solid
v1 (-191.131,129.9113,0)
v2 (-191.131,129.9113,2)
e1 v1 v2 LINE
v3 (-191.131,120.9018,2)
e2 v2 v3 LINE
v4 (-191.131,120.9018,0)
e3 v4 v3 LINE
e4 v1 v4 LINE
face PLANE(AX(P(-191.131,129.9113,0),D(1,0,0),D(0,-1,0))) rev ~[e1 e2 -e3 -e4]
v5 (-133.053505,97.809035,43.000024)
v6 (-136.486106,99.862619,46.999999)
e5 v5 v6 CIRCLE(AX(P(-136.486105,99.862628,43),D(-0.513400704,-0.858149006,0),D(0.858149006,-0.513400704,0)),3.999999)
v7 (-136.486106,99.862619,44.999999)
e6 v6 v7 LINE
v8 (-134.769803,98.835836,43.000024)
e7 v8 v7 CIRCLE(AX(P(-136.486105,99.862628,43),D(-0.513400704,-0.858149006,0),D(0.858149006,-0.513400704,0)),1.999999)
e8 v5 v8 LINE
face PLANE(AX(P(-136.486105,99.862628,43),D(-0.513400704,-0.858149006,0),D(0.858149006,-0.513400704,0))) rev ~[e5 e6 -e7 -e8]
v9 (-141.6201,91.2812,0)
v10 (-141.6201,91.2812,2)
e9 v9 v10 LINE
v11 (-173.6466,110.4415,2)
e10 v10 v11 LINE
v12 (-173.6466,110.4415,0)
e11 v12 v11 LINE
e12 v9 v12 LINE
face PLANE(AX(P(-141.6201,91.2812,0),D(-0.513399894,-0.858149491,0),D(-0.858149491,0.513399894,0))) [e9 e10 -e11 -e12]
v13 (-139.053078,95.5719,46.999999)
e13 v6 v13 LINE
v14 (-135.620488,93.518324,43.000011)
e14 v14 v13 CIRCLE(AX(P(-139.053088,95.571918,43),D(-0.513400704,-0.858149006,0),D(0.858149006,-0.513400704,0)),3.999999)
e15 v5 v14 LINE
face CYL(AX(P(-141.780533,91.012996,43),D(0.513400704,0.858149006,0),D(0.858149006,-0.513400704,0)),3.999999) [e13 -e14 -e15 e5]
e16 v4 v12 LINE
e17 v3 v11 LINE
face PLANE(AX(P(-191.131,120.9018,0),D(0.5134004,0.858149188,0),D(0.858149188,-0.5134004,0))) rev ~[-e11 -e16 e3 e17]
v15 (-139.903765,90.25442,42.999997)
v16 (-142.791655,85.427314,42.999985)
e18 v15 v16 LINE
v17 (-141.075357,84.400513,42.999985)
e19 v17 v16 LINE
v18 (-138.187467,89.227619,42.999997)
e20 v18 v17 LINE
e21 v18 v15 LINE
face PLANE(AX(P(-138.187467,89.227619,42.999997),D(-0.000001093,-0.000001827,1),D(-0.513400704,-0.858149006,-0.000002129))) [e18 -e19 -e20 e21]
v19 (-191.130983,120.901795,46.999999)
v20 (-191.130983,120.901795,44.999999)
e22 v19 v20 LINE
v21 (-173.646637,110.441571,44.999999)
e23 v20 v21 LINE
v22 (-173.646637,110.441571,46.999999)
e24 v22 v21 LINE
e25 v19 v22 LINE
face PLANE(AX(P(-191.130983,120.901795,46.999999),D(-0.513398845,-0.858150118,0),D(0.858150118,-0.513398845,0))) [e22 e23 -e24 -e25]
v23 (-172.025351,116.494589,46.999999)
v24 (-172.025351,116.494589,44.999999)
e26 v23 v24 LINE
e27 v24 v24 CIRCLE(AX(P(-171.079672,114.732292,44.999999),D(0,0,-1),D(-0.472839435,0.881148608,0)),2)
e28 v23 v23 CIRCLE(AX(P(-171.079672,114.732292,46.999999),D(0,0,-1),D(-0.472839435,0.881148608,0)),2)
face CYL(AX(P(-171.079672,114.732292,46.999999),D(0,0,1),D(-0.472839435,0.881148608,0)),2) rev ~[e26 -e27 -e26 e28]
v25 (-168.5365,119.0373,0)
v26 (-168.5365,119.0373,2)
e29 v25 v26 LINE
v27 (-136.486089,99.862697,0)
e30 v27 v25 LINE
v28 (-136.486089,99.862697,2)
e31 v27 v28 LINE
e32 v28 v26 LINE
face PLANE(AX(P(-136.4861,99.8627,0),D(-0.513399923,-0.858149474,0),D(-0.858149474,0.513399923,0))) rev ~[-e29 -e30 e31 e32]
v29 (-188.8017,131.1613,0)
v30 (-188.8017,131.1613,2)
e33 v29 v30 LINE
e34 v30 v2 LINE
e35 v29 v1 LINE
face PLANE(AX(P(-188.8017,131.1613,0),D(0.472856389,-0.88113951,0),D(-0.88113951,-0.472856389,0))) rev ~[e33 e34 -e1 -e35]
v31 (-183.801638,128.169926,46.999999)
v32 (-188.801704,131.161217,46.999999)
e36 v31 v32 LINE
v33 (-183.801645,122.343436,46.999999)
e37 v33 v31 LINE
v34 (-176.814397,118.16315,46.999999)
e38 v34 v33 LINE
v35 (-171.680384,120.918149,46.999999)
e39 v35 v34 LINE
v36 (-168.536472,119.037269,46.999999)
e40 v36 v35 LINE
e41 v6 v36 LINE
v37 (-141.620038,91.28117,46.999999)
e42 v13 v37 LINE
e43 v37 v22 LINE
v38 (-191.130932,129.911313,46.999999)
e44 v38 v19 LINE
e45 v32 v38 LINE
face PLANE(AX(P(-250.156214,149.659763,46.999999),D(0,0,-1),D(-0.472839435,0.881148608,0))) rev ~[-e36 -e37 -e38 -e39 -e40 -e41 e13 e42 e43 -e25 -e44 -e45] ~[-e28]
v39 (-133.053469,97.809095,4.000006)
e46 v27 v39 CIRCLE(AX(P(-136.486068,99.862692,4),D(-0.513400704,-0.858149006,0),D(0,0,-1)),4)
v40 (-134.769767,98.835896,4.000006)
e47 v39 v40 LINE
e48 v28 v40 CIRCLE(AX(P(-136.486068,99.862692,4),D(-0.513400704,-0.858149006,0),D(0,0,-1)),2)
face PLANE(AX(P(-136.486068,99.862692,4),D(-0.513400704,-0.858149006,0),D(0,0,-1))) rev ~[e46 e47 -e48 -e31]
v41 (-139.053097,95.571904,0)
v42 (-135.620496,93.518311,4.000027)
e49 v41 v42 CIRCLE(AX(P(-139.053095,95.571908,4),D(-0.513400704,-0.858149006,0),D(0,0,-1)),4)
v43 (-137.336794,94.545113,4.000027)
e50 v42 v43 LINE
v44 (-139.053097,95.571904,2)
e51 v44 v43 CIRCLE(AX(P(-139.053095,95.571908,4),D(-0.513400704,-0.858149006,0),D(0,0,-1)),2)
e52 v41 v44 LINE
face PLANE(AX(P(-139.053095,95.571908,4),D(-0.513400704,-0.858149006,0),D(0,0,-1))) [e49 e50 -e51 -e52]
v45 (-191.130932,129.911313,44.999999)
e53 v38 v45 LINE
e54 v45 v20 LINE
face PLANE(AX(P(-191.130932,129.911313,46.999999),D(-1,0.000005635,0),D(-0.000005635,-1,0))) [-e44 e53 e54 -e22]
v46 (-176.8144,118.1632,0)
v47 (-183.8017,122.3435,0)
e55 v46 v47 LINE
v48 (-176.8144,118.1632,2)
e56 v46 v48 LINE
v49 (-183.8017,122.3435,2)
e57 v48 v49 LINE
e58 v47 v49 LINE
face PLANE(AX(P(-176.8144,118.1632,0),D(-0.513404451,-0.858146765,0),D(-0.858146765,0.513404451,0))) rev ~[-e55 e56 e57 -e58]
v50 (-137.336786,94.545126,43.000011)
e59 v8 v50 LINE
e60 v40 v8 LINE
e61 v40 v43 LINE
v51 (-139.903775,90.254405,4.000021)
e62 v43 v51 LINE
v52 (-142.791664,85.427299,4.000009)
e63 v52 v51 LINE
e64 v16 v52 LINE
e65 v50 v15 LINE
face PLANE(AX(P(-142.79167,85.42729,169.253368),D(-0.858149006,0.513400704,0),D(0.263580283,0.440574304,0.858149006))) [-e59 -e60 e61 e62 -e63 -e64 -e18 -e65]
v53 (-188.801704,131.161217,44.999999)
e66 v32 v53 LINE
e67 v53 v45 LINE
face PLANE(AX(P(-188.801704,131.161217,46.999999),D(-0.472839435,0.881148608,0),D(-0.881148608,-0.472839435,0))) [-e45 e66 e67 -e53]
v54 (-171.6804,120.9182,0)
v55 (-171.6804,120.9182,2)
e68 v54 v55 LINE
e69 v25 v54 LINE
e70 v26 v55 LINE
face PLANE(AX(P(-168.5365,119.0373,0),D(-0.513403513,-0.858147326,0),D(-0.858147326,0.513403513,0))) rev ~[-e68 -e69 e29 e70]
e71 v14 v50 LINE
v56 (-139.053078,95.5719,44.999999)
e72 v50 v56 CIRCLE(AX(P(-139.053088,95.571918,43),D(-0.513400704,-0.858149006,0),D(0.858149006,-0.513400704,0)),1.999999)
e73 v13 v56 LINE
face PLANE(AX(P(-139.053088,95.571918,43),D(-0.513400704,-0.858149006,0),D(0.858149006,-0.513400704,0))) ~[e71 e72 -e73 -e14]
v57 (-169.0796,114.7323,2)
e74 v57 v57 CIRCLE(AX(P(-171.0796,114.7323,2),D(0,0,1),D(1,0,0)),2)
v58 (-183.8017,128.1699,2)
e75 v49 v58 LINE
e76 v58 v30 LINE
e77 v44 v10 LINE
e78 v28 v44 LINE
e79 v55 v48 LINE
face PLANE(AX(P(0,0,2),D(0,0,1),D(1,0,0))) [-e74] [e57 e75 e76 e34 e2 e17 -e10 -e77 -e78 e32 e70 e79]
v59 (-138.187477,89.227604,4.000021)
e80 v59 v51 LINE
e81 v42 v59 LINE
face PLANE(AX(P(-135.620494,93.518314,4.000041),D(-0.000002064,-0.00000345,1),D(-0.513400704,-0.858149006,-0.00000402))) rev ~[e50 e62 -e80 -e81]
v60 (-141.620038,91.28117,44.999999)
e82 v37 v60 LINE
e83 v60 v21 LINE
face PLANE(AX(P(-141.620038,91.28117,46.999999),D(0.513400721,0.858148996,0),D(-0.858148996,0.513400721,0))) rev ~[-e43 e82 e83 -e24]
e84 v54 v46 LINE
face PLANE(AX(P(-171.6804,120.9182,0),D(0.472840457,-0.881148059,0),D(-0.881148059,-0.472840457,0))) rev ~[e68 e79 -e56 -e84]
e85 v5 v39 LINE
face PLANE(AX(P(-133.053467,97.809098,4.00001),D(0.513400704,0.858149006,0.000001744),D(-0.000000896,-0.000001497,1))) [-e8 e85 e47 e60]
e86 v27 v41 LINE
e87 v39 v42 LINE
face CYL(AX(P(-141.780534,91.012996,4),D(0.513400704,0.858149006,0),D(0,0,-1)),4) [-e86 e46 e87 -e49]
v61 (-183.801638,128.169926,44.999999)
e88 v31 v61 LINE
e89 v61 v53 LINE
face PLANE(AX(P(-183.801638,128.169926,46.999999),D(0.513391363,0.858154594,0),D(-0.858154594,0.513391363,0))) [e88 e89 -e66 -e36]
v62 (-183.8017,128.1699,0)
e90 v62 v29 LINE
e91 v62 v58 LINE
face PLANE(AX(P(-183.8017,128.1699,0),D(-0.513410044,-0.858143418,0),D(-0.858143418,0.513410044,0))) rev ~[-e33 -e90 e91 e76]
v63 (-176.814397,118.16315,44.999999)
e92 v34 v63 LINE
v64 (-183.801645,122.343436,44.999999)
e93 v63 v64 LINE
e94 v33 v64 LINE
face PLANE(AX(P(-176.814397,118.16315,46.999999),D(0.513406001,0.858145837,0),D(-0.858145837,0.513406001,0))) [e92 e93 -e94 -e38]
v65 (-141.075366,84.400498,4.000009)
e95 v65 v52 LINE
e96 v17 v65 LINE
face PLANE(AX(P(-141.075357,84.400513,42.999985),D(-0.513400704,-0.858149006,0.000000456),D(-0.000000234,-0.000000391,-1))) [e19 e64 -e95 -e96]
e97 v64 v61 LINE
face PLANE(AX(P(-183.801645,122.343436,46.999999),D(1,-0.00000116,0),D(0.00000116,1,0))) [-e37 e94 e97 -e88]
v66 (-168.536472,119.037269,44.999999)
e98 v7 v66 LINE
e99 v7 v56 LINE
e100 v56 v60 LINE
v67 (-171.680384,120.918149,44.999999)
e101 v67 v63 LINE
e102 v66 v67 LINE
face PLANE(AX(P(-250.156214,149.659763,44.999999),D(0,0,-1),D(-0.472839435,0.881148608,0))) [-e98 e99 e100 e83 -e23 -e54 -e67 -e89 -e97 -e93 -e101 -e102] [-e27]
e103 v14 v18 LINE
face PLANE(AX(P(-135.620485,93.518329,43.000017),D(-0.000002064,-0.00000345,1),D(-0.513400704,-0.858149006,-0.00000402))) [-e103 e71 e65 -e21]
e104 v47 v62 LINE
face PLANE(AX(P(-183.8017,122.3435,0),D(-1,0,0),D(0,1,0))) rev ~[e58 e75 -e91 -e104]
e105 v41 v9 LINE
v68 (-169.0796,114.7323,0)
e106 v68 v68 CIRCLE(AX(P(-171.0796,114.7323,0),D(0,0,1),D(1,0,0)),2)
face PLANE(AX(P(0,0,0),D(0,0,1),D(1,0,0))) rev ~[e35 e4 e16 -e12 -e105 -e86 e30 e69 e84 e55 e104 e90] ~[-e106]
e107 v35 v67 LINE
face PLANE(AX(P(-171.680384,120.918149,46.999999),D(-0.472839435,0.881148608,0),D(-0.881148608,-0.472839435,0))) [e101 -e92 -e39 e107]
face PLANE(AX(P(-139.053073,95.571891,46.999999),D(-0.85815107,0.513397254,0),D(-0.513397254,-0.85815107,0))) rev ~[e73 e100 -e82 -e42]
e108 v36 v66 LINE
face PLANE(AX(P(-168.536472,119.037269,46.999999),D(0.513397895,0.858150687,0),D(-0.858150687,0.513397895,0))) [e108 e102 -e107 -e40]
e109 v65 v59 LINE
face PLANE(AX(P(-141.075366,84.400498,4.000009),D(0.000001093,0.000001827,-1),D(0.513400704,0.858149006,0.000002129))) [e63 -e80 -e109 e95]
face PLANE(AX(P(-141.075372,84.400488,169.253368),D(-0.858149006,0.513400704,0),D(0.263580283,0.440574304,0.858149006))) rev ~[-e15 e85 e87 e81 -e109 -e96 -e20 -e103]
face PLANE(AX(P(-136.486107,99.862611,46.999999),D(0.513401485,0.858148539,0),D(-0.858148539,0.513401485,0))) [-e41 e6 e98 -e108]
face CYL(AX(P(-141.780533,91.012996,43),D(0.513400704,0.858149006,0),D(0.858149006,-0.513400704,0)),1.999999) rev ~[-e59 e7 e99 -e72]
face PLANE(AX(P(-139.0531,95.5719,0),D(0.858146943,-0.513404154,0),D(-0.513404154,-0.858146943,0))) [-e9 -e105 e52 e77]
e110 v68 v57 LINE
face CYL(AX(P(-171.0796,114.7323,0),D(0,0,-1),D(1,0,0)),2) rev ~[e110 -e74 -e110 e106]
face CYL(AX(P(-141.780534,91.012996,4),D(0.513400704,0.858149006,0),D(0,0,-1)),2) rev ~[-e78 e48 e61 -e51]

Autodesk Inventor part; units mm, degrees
ref_plane "YZ Plane" through (0, 0, 0) normal (1, 0, 0) x (0, 1, 0)
ref_plane "XZ Plane" through (0, 0, 0) normal (0, 1, 0) x (-1, 0, 0)
ref_plane "XY Plane" through (0, 0, 0) normal (0, 0, 1) x (1, 0, 0)
sketch "Sketch3" plane through (0, 0, 0) normal (0, 0, 1) x (1, 0, 0)
  circle A0 centre (367.816, 50) radius 50 construction
  line L0 (367.816, 0) -> (512.7041, 0) construction
  line L1 (367.816, 50) -> (512.7041, 50) construction
  line L2 (367.816, 100) -> (512.7041, 100) construction
  line L3 (367.816, 50) -> (342.816, 6.6987) construction
  line L4 (367.816, 50) -> (324.5147, 25) construction
  line L5 (367.816, 50) -> (324.5147, 75) construction
  line L6 (342.816, 93.3013) -> (367.816, 50) construction
  line L7 (392.816, 93.3013) -> (367.816, 50) construction
  line L8 (411.1173, 75) -> (367.816, 50) construction
  line L9 (411.1173, 25) -> (367.816, 50) construction
  line L10 (392.816, 6.6987) -> (367.816, 50) construction
  line L11 (367.816, 0) -> (367.816, 100) construction
  line L12 (417.816, 50) -> (367.816, 50) construction
  line L13 (341.6361, 0) -> (341.6361, 100) construction
  line L14 (315.4561, 0) -> (315.4561, 100) construction
  line L15 (289.2762, 0) -> (289.2762, 100) construction
  line L16 (263.0963, 0) -> (263.0963, 100) construction
  line L17 (236.9163, 0) -> (236.9163, 100) construction
  line L18 (210.7364, 0) -> (210.7364, 100) construction
  line L19 (184.5564, 0) -> (184.5564, 100) construction
  line L20 (158.3765, 0) -> (158.3765, 100) construction
  circle A1 centre (315.4561, 50) radius 50 construction
  circle A2 centre (341.6361, 50) radius 50 construction
  circle A3 centre (289.2762, 50) radius 50 construction
  circle A4 centre (263.0963, 50) radius 50 construction
  circle A5 centre (236.9163, 50) radius 50 construction
  circle A6 centre (210.7364, 50) radius 50 construction
  line L21 (392.816, 6.6987) -> (512.7041, 6.6987) construction
  line L22 (411.1173, 25) -> (512.7041, 25) construction
  line L23 (411.1173, 75) -> (512.7041, 75) construction
  line L24 (411.1173, 75) -> (512.7041, 75) construction
  line L25 (392.816, 93.3013) -> (512.7041, 93.3013) construction
  line L26 (358.7574, 75) -> (339.2762, 50) construction
  line L27 (339.2762, 50) -> (306.3975, 25) construction
  line L28 (306.3975, 25) -> (261.9163, 6.6987) construction
  line L29 (261.9163, 6.6987) -> (210.7364, 0) construction
  line L30 (105.3682, -12.9392) -> (105.3682, 124.4333) construction
  line L31 (21.25, 0) -> (21.25, 12)
  line L32 (35.45, 12) -> (35.45, -11.8433)
  arc A7 (0, 0) -> (6.625, -9.8433) centre (10.625, 0) ccw
  arc A8 (14.625, -9.8433) -> (21.25, 0) centre (10.625, 0) ccw
  line L33 (35.45, -11.8433) -> (14.625, -11.8433)
  line L34 (6.625, -11.8433) -> (-195.0796, -11.8433)
  circle A9 centre (-144.26, 100.8473) radius 12.875 construction
  line L35 (6.625, -11.8433) -> (6.625, -9.8433)
  line L36 (14.625, -11.8433) -> (14.625, -9.8433)
  line L37 (411.1173, 75) -> (158.3765, 75) construction
  line L38 (367.816, 100) -> (158.3765, 100) construction
  line L39 (417.816, 50) -> (158.3765, 50) construction
  line L40 (411.1173, 25) -> (158.3765, 25) construction
  line L41 (392.816, 6.6987) -> (158.3765, 6.6987) construction
  line L42 (392.816, 93.3013) -> (158.3765, 93.3013) construction
  line L43 (358.7574, 75) -> (366.6361, 93.3013) construction
  line L44 (366.6361, 93.3013) -> (367.816, 100) construction
  spline S0 degree 4 poles (-157.0796, 100) (-157.0796, 88.9946) (-147.011, 72.6811) (-131.8577, 48.7932) (-88.4777, 17.6268) (-50.0176, 3.937) (-18.8717, 0) (0, 0) knots 0 0 0 0 0 0.264547 0.457223 0.66608 1 1 1 1 1
  line L45 (-157.0796, 100) -> (-157.0796, 38) construction
  line L46 (0, 0) -> (-157.0796, 0) construction
  line L47 (-144.26, 100.8473) -> (-157.135, 100.8473) construction
  circle A10 centre (-146.4546, 100) radius 10.625 construction
  line L48 (-146.4546, 100) -> (-157.0796, 100) construction
  line L49 (-141.0754, 84.4005) -> (-135.6205, 93.5183) construction
  line L50 (-141.0796, 132.0528) -> (-171.0796, 149.3733) construction
  line L51 (-171.0796, 149.3733) -> (-201.0796, 132.0528) construction
  line L52 (-141.0754, 84.4005) -> (-99.2801, 84.4005) construction
  line L53 (-201.0796, 132.0528) -> (-201.0796, 97.4118) construction
  line L54 (-201.0796, 97.4118) -> (-171.0796, 80.0913) construction
  line L55 (0, 0) -> (-157.0796, 93.9753) construction
  line L56 (-135.6205, 93.5183) -> (-137.3368, 94.5451) construction
  line L57 (-137.3368, 94.5451) -> (-143.2815, 84.6085) construction
  line L58 (-137.3368, 94.5451) -> (-171.0796, 114.7323) construction
  line L59 (-201.0796, 132.0528) -> (-171.0796, 114.7323) construction
  arc A11 (-137.3368, 94.5451) -> (-144.7045, 143.8948) centre (-171.0796, 114.7323) ccw construction
  arc A12 (-142.7917, 85.4273) -> (-147.1443, 147.6882) centre (-171.0796, 114.7323) ccw construction
  line L60 (-171.0796, 80.0913) -> (-171.0796, 35)
  circle A13 centre (-171.0796, 114.7323) radius 2.5 construction
  arc A14 (-167.4345, 120.8251) -> (-174.7248, 108.6394) centre (-171.0796, 114.7323) ccw construction
  line L61 (-167.4345, 120.8251) -> (-157.0796, 114.6302) construction
  line L62 (-171.0796, 80.0913) -> (-171.0796, 106.4587)
  line L63 (-171.0796, 106.4587) -> (-174.7248, 108.6394) construction
  line L64 (-171.0796, 35) -> (-191.5296, 23.1932)
  arc A15 (-191.5296, 23.1932) -> (-195.0796, 17.0444) centre (-187.9796, 17.0444) ccw
  line L65 (-195.0796, 17.0444) -> (-195.0796, -11.8433)
  arc A16 (35.45, 12) -> (21.25, 12) centre (28.35, 12) ccw
  line L66 (-157.0796, 114.6302) -> (-157.0796, 99.9865) construction
  circle A17 centre (-164.0796, 103.4587) radius 2.5
  line L67 (-171.0796, 103.4587) -> (-157.0796, 103.4587) construction
  circle A18 centre (-185.1284, 15.3983) radius 2.5
  line L68 (-185.1284, 15.3983) -> (-194.1284, 20.5944) construction
  circle A19 centre (-6, -5.9217) radius 2.5
  line L69 (-6, -11.8433) -> (-6, 0) construction
  circle A20 centre (28.35, 12) radius 2.5
  circle A21 centre (28.35, -5.9217) radius 2.5
  line L70 (-167.4345, 320.8251) -> (-157.0796, 314.6302) construction
  arc A22 (-167.4345, 320.8251) -> (-174.7248, 308.6394) centre (-171.0796, 314.7323) ccw construction
  circle A23 centre (-171.0796, 314.7323) radius 2.5 construction
  line L71 (-171.0796, 280.0913) -> (-171.0796, 306.4587)
  line L72 (-171.0796, 306.4587) -> (-174.7248, 308.6394) construction
  line L73 (-157.0796, 314.6302) -> (-157.0796, 299.9865) construction
  circle A24 centre (-164.0796, 303.4587) radius 2.5
  spline S1 degree 4 poles (-157.0796, 300) (-157.0796, 288.9946) (-147.0234, 272.6841) (-124.1789, 236.7977) (-70.8039, 208.0704) (-31.8865, 200.2943) (0, 200) knots 0 0 0 0 0 0.264547 0.457223 1 1 1 1 1 construction
  line L74 (-157.0796, 300) -> (-157.0796, 238) construction
  arc A25 (0, 200) -> (6.625, 190.1567) centre (10.625, 200) ccw
  line L75 (35.45, 212) -> (35.45, 188.1567)
  circle A26 centre (28.35, 212) radius 2.5
  circle A27 centre (28.35, 194.0783) radius 2.5
  arc A28 (35.45, 212) -> (21.25, 212) centre (28.35, 212) ccw
  line L76 (21.25, 200) -> (21.25, 212)
  line L77 (35.45, 188.1567) -> (14.625, 188.1567)
  arc A29 (14.625, 190.1567) -> (21.25, 200) centre (10.625, 200) ccw
  line L78 (14.625, 188.1567) -> (14.625, 190.1567)
  line L79 (-185.1284, 215.3983) -> (-194.1284, 220.5944) construction
  arc A30 (-191.5296, 223.1932) -> (-195.0796, 217.0444) centre (-187.9796, 217.0444) ccw
  line L80 (-195.0796, 217.0444) -> (-195.0796, 188.1567)
  line L81 (-171.0796, 235) -> (-191.5296, 223.1932)
  circle A31 centre (-185.1284, 215.3983) radius 2.5
  line L82 (-171.0796, 280.0913) -> (-171.0796, 235)
  line L83 (6.625, 188.1567) -> (-195.0796, 188.1567)
  line L84 (6.625, 188.1567) -> (6.625, 190.1567)
  line L85 (-137.3368, 294.5451) -> (-143.2815, 284.6085) construction
  line L86 (-141.0754, 284.4005) -> (-135.6205, 293.5183) construction
  line L87 (0, 200) -> (-157.0796, 293.9753)
  line L88 (-167.4345, 520.8251) -> (-157.0796, 514.6302) construction
  arc A32 (-167.4345, 520.8251) -> (-174.7248, 508.6394) centre (-171.0796, 514.7323) ccw construction
  circle A33 centre (-171.0796, 514.7323) radius 2.5 construction
  line L89 (-171.0796, 480.0913) -> (-171.0796, 506.4587)
  line L90 (-171.0796, 506.4587) -> (-174.7248, 508.6394) construction
  line L91 (-157.0796, 514.6302) -> (-157.0796, 499.9865) construction
  circle A34 centre (-164.0796, 503.4587) radius 2.5
  spline S2 degree 4 poles (-157.0796, 500) (-157.0796, 488.9946) (-147.0234, 472.6841) (-124.1789, 436.7977) (-70.8039, 408.0704) (-31.8865, 400.2943) (0, 400) knots 0 0 0 0 0 0.264547 0.457223 1 1 1 1 1 construction
  line L92 (-157.0796, 500) -> (-157.0796, 438)
  arc A35 (0, 400) -> (6.625, 390.1567) centre (10.625, 400) ccw
  line L93 (35.45, 412) -> (35.45, 388.1567)
  circle A36 centre (28.35, 412) radius 2.5
  circle A37 centre (28.35, 394.0783) radius 2.5
  arc A38 (35.45, 412) -> (21.25, 412) centre (28.35, 412) ccw
  line L94 (21.25, 400) -> (21.25, 412)
  line L95 (35.45, 388.1567) -> (14.625, 388.1567)
  arc A39 (14.625, 390.1567) -> (21.25, 400) centre (10.625, 400) ccw
  line L96 (14.625, 388.1567) -> (14.625, 390.1567)
  line L97 (-185.1284, 415.3983) -> (-194.1284, 420.5944) construction
  arc A40 (-191.5296, 423.1932) -> (-195.0796, 417.0444) centre (-187.9796, 417.0444) ccw
  line L98 (-195.0796, 417.0444) -> (-195.0796, 388.1567)
  line L99 (-171.0796, 435) -> (-191.5296, 423.1932)
  circle A41 centre (-185.1284, 415.3983) radius 2.5
  line L100 (-171.0796, 480.0913) -> (-171.0796, 435)
  line L101 (6.625, 388.1567) -> (-195.0796, 388.1567)
  line L102 (6.625, 388.1567) -> (6.625, 390.1567)
  line L103 (-137.3368, 494.5451) -> (-143.2815, 484.6085) construction
  line L104 (-141.0754, 484.4005) -> (-135.6205, 493.5183) construction
  line L105 (0, 400) -> (-157.0796, 493.9753) construction
  line L106 (-467.4345, 120.8251) -> (-457.0796, 114.6302) construction
  arc A42 (-467.4345, 120.8251) -> (-474.7248, 108.6394) centre (-471.0796, 114.7323) ccw construction
  circle A43 centre (-471.0796, 114.7323) radius 2.5 construction
  line L107 (-471.0796, 80.0913) -> (-471.0796, 106.4587)
  line L108 (-471.0796, 106.4587) -> (-474.7248, 108.6394) construction
  line L109 (-457.0796, 114.6302) -> (-457.0796, 99.9865) construction
  circle A44 centre (-464.0796, 103.4587) radius 2.5
  spline S3 degree 4 poles (-457.0796, 100) (-457.0796, 88.9946) (-447.0234, 72.6841) (-424.1789, 36.7977) (-370.8039, 8.0704) (-331.8865, 0.2943) (-300, 0) knots 0 0 0 0 0 0.264547 0.457223 1 1 1 1 1 construction
  line L110 (-457.0796, 100) -> (-457.0796, 38) construction
  arc A45 (-300, 0) -> (-293.375, -9.8433) centre (-289.375, 0) ccw construction
  line L111 (-264.55, 12) -> (-264.55, -11.8433)
  circle A46 centre (-271.65, 12) radius 2.5
  circle A47 centre (-271.65, -5.9217) radius 2.5
  arc A48 (-264.55, 12) -> (-278.75, 12) centre (-271.65, 12) ccw
  line L112 (-278.75, 0) -> (-278.75, 12) construction
  line L113 (-264.55, -11.8433) -> (-285.375, -11.8433)
  arc A49 (-285.375, -9.8433) -> (-278.75, 0) centre (-289.375, 0) ccw construction
  line L114 (-285.375, -11.8433) -> (-285.375, -9.8433) construction
  line L115 (-485.1284, 15.3983) -> (-494.1284, 20.5944) construction
  arc A50 (-491.5296, 23.1932) -> (-495.0796, 17.0444) centre (-487.9796, 17.0444) ccw
  line L116 (-495.0796, 17.0444) -> (-495.0796, -11.8433)
  line L117 (-471.0796, 35) -> (-491.5296, 23.1932)
  circle A51 centre (-485.1284, 15.3983) radius 2.5
  line L118 (-471.0796, 80.0913) -> (-471.0796, 35)
  line L119 (-293.375, -11.8433) -> (-495.0796, -11.8433)
  line L120 (-293.375, -11.8433) -> (-293.375, -9.8433) construction
  line L121 (-437.3368, 94.5451) -> (-443.2815, 84.6085) construction
  line L122 (-441.0754, 84.4005) -> (-435.6205, 93.5183) construction
  line L123 (-300, 0) -> (-457.0796, 93.9753) construction
  line L124 (-467.4345, 320.8251) -> (-457.0796, 314.6302) construction
  arc A52 (-467.4345, 320.8251) -> (-474.7248, 308.6394) centre (-471.0796, 314.7323) ccw construction
  circle A53 centre (-471.0796, 314.7323) radius 2.5 construction
  line L125 (-471.0796, 280.0913) -> (-471.0796, 306.4587)
  line L126 (-471.0796, 306.4587) -> (-474.7248, 308.6394) construction
  line L127 (-457.0796, 314.6302) -> (-457.0796, 299.9865) construction
  circle A54 centre (-464.0796, 303.4587) radius 2.5
  spline S4 degree 4 poles (-457.0796, 300) (-457.0796, 288.9946) (-447.0234, 272.6841) (-424.1789, 236.7977) (-370.8039, 208.0704) (-331.8865, 200.2943) (-300, 200) knots 0 0 0 0 0 0.264547 0.457223 1 1 1 1 1 construction
  line L128 (-457.0796, 300) -> (-457.0796, 238) construction
  arc A55 (-300, 200) -> (-293.375, 190.1567) centre (-289.375, 200) ccw construction
  line L129 (-264.55, 212) -> (-264.55, 188.1567)
  circle A56 centre (-271.65, 212) radius 2.5
  circle A57 centre (-271.65, 194.0783) radius 2.5
  arc A58 (-264.55, 212) -> (-278.75, 212) centre (-271.65, 212) ccw
  line L130 (-278.75, 200) -> (-278.75, 212) construction
  line L131 (-264.55, 188.1567) -> (-285.375, 188.1567)
  arc A59 (-285.375, 190.1567) -> (-278.75, 200) centre (-289.375, 200) ccw construction
  line L132 (-285.375, 188.1567) -> (-285.375, 190.1567) construction
  line L133 (-485.1284, 215.3983) -> (-494.1284, 220.5944) construction
  arc A60 (-491.5296, 223.1932) -> (-495.0796, 217.0444) centre (-487.9796, 217.0444) ccw
  line L134 (-495.0796, 217.0444) -> (-495.0796, 188.1567)
  line L135 (-471.0796, 235) -> (-491.5296, 223.1932)
  circle A61 centre (-485.1284, 215.3983) radius 2.5
  line L136 (-471.0796, 280.0913) -> (-471.0796, 235)
  line L137 (-293.375, 188.1567) -> (-495.0796, 188.1567)
  line L138 (-293.375, 188.1567) -> (-293.375, 190.1567) construction
  line L139 (-437.3368, 294.5451) -> (-443.2815, 284.6085) construction
  line L140 (-441.0754, 284.4005) -> (-435.6205, 293.5183) construction
  line L141 (-300, 200) -> (-457.0796, 293.9753) construction
  line L142 (-467.4345, 520.8251) -> (-457.0796, 514.6302)
  arc A62 (-467.4345, 520.8251) -> (-474.7248, 508.6394) centre (-471.0796, 514.7323) ccw
  circle A63 centre (-471.0796, 514.7323) radius 2.5
  line L143 (-471.0796, 480.0913) -> (-471.0796, 506.4587)
  line L144 (-471.0796, 506.4587) -> (-474.7248, 508.6394)
  line L145 (-457.0796, 514.6302) -> (-457.0796, 499.9865)
  circle A64 centre (-464.0796, 503.4587) radius 2.5
  spline S5 degree 4 poles (-457.0796, 500) (-457.0796, 488.9946) (-447.0234, 472.6841) (-424.1789, 436.7977) (-370.8039, 408.0704) (-331.8865, 400.2943) (-300, 400) knots 0 0 0 0 0 0.264547 0.457223 1 1 1 1 1 construction
  line L146 (-457.0796, 500) -> (-457.0796, 438) construction
  arc A65 (-300, 400) -> (-293.375, 390.1567) centre (-289.375, 400) ccw construction
  line L147 (-264.55, 412) -> (-264.55, 388.1567) construction
  circle A66 centre (-271.65, 412) radius 2.5
  circle A67 centre (-271.65, 394.0783) radius 2.5
  arc A68 (-264.55, 412) -> (-278.75, 412) centre (-271.65, 412) ccw
  line L148 (-278.75, 400) -> (-278.75, 412) construction
  line L149 (-264.55, 388.1567) -> (-285.375, 388.1567)
  arc A69 (-285.375, 390.1567) -> (-278.75, 400) centre (-289.375, 400) ccw construction
  line L150 (-285.375, 388.1567) -> (-285.375, 390.1567) construction
  line L151 (-485.1284, 415.3983) -> (-494.1284, 420.5944) construction
  arc A70 (-491.5296, 423.1932) -> (-495.0796, 417.0444) centre (-487.9796, 417.0444) ccw
  line L152 (-495.0796, 417.0444) -> (-495.0796, 388.1567) construction
  line L153 (-471.0796, 435) -> (-491.5296, 423.1932)
  circle A71 centre (-485.1284, 415.3983) radius 2.5
  line L154 (-471.0796, 480.0913) -> (-471.0796, 435)
  line L155 (-293.375, 388.1567) -> (-495.0796, 388.1567)
  line L156 (-293.375, 388.1567) -> (-293.375, 390.1567) construction
  line L157 (-437.3368, 494.5451) -> (-443.2815, 484.6085) construction
  line L158 (-441.0754, 484.4005) -> (-435.6205, 493.5183) construction
  line L159 (-300, 400) -> (-457.0796, 493.9753) construction
  line L160 (-435.4304, 87.048) -> (-430.3073, 83.9831)
  line L161 (-430.3073, 83.9831) -> (-430.3073, 78.0131)
  line L162 (-457.0796, 100) -> (-443.128, 91.6532)
  line L163 (-443.2208, 85.684) -> (-443.128, 91.6532)
  line L164 (-440.6463, 84.1438) -> (-435.4304, 87.048)
  line L165 (-440.6463, 84.1438) -> (-443.2208, 85.684)
  line L166 (-430.3073, 78.0131) -> (-436.0283, 74.7101)
  line L167 (-436.0283, 74.7101) -> (-436.0283, 68.1041)
  spline S6 degree 4 poles (-439.3753, 72.7777) (-420.1522, 45.3403) (-398.6357, 22.4496) (-337.1208, 4.2654) (-300, 5.1701) knots 0 0 0 0 0 1 1 1 1 1
  line L168 (-293.375, -11.8433) -> (-285.375, -11.8433)
  line L169 (-157.0796, 293.9753) -> (-157.0796, 300)
  line L170 (-293.375, 188.1567) -> (-285.375, 188.1567)
  arc A72 (-157.0796, 438) -> (-119.0796, 400) centre (-119.0796, 438) ccw
  line L171 (-119.0796, 400) -> (0, 400)
  line L172 (-457.0796, 500) -> (-457.0796, 438) construction
  line L173 (-419.0796, 400) -> (-300, 400) construction
  arc A73 (-457.0796, 438) -> (-419.0796, 400) centre (-419.0796, 438) ccw construction
  line L174 (-457.0796, 300) -> (-443.128, 291.6532)
  line L175 (-443.2208, 285.684) -> (-443.128, 291.6532)
  line L176 (-440.6463, 284.1438) -> (-443.2208, 285.684)
  line L177 (-440.6463, 284.1438) -> (-435.4304, 287.048)
  line L178 (-435.4304, 287.048) -> (-430.3073, 283.9831)
  line L179 (-430.3073, 283.9831) -> (-430.3073, 278.0131) construction
  line L180 (-430.3073, 278.0131) -> (-436.0283, 274.7101) construction
  line L181 (-457.0796, 500) -> (-443.128, 491.6532)
  line L182 (-443.2208, 485.684) -> (-443.128, 491.6532)
  line L183 (-440.6463, 484.1438) -> (-443.2208, 485.684)
  line L184 (-440.6463, 484.1438) -> (-435.4304, 487.048)
  line L185 (-435.4304, 487.048) -> (-430.3073, 483.9831)
  line L186 (-430.3073, 483.9831) -> (-430.3073, 478.0131)
  line L187 (-430.3073, 478.0131) -> (-436.0283, 474.7101)
  line L188 (-430.3073, 283.9831) -> (-298.5715, 205.1701)
  line L189 (-293.375, 388.1567) -> (-285.375, 388.1567)
  line L190 (-300, 5.1701) -> (-285.5799, 5.1701)
  arc A74 (-285.5799, 5.1701) -> (-278.75, 12) centre (-285.5799, 12) ccw
  line L191 (-298.5715, 205.1701) -> (-285.5799, 205.1701)
  arc A75 (-285.5799, 205.1701) -> (-278.75, 212) centre (-285.5799, 212) ccw
  line L192 (-436.0283, 474.7101) -> (-451.9095, 465.5411)
  line L193 (-451.9095, 465.5411) -> (-451.9095, 438)
  arc A76 (-451.9095, 438) -> (-419.0796, 405.1701) centre (-419.0796, 438) ccw
  line L194 (-419.0796, 405.1701) -> (-285.5799, 405.1701)
  arc A77 (-285.5799, 405.1701) -> (-278.75, 412) centre (-285.5799, 412) ccw
  line L195 (-495.0796, 388.1567) -> (-514.2796, 388.1567)
  line L196 (-514.2796, 388.1567) -> (-514.2796, 392.1567)
  line L197 (-514.2796, 392.1567) -> (-498.0796, 392.1567)
  arc A78 (-498.0796, 392.1567) -> (-495.0796, 395.1567) centre (-498.0796, 395.1567) ccw
  line L198 (-495.0796, 395.1567) -> (-495.0796, 417.0444)
  line L199 (-499.0796, 388.1567) -> (-510.2796, 388.1567) construction
  line L200 (-510.2796, 388.1567) -> (-510.2796, 392.1567) construction
  line L201 (-510.2796, 392.1567) -> (-499.0796, 392.1567) construction
  line L202 (-499.0796, 392.1567) -> (-499.0796, 388.1567) construction
  line L203 (-499.0796, 388.1567) -> (-510.2796, 392.1567) construction
  line L204 (-510.2796, 388.1567) -> (-499.0796, 392.1567) construction
  arc A79 (-600, 200) -> (-593.375, 190.1567) centre (-589.375, 200) ccw construction
  line L205 (-564.55, 212) -> (-564.55, 188.1567) construction
  circle A80 centre (-571.65, 212) radius 2.5
  circle A81 centre (-571.65, 194.0783) radius 2.5
  arc A82 (-564.55, 212) -> (-578.75, 212) centre (-571.65, 212) ccw
  line L206 (-578.75, 200) -> (-578.75, 212) construction
  line L207 (-564.55, 188.1567) -> (-585.375, 188.1567)
  arc A83 (-585.375, 190.1567) -> (-578.75, 200) centre (-589.375, 200) ccw construction
  line L208 (-585.375, 188.1567) -> (-585.375, 190.1567) construction
  line L209 (-593.375, 188.1567) -> (-593.375, 190.1567) construction
  arc A84 (-585.5799, 205.1701) -> (-578.75, 212) centre (-585.5799, 212) ccw
  line L210 (-593.375, 188.1567) -> (-585.375, 188.1567)
  line L211 (-598.5715, 205.1701) -> (-585.5799, 205.1701)
  arc A85 (-791.5296, 223.1932) -> (-795.0796, 217.0444) centre (-787.9796, 217.0444) ccw
  line L212 (-785.1284, 215.3983) -> (-794.1284, 220.5944) construction
  circle A86 centre (-785.1284, 215.3983) radius 2.5
  line L213 (-771.0796, 235) -> (-791.5296, 223.1932)
  line L214 (-795.0796, 217.0444) -> (-795.0796, 188.1567) construction
  line L215 (-730.3073, 278.0131) -> (-736.0283, 274.7101) construction
  line L216 (-757.0796, 300) -> (-757.0796, 238) construction
  line L217 (-730.3073, 283.9831) -> (-730.3073, 278.0131) construction
  line L218 (-730.3073, 283.9831) -> (-598.5715, 205.1701)
  line L219 (-600, 200) -> (-757.0796, 293.9753) construction
  spline S7 degree 4 poles (-757.0796, 300) (-757.0796, 288.9946) (-747.0234, 272.6841) (-724.1789, 236.7977) (-670.8039, 208.0704) (-631.8865, 200.2943) (-600, 200) knots 0 0 0 0 0 0.264547 0.457223 1 1 1 1 1 construction
  line L220 (-593.375, 188.1567) -> (-795.0796, 188.1567)
  line L221 (-771.0796, 280.0913) -> (-771.0796, 235)
  line L222 (-757.0796, 300) -> (-743.128, 291.6532)
  line L223 (-743.2208, 285.684) -> (-743.128, 291.6532)
  line L224 (-740.6463, 284.1438) -> (-743.2208, 285.684)
  line L225 (-737.3368, 294.5451) -> (-743.2815, 284.6085) construction
  line L226 (-741.0754, 284.4005) -> (-735.6205, 293.5183) construction
  line L227 (-740.6463, 284.1438) -> (-735.4304, 287.048)
  line L228 (-735.4304, 287.048) -> (-730.3073, 283.9831)
  line L229 (-767.4345, 320.8251) -> (-757.0796, 314.6302)
  line L230 (-771.0796, 280.0913) -> (-771.0796, 306.4587)
  line L231 (-757.0796, 314.6302) -> (-757.0796, 299.9865)
  circle A87 centre (-764.0796, 303.4587) radius 2.5
  line L232 (-771.0796, 306.4587) -> (-774.7248, 308.6394)
  circle A88 centre (-771.0796, 314.7323) radius 2.5
  arc A89 (-767.4345, 320.8251) -> (-774.7248, 308.6394) centre (-771.0796, 314.7323) ccw
  line L233 (-795.0796, 188.1567) -> (-814.2796, 188.1567)
  line L234 (-814.2796, 188.1567) -> (-814.2796, 192.1567)
  line L235 (-814.2796, 192.1567) -> (-798.0796, 192.1567)
  arc A90 (-798.0796, 192.1567) -> (-795.0796, 195.1567) centre (-798.0796, 195.1567) ccw
  line L236 (-795.0796, 195.1567) -> (-795.0796, 217.0444)
  line L237 (-799.0796, 188.1567) -> (-810.2796, 188.1567) construction
  line L238 (-810.2796, 188.1567) -> (-810.2796, 192.1567) construction
  line L239 (-810.2796, 192.1567) -> (-799.0796, 192.1567) construction
  line L240 (-799.0796, 192.1567) -> (-799.0796, 188.1567) construction
  line L241 (-799.0796, 188.1567) -> (-810.2796, 192.1567) construction
  line L242 (-810.2796, 188.1567) -> (-799.0796, 192.1567) construction
  line L243 (-495.0796, 587.6927) -> (-264.55, 587.6927) construction
  line L244 (-379.8148, 587.6927) -> (-379.8148, 614.3146) construction
  line L245 (-795.0796, 438) -> (-564.55, 438) construction
  line L246 (-679.8148, 438) -> (-679.8148, 492.8294) construction
  arc A91 (-564.55, 195.1567) -> (-561.55, 192.1567) centre (-561.55, 195.1567) ccw
  line L247 (-545.35, 192.1567) -> (-561.55, 192.1567)
  line L248 (-545.35, 188.1567) -> (-545.35, 192.1567)
  line L249 (-560.55, 192.1567) -> (-560.55, 188.1567) construction
  line L250 (-560.55, 188.1567) -> (-549.35, 188.1567) construction
  line L251 (-564.55, 188.1567) -> (-545.35, 188.1567)
  line L252 (-549.35, 188.1567) -> (-549.35, 192.1567) construction
  line L253 (-549.35, 192.1567) -> (-560.55, 192.1567) construction
  line L254 (-560.55, 188.1567) -> (-549.35, 192.1567) construction
  line L255 (-549.35, 188.1567) -> (-560.55, 192.1567) construction
  line L256 (-564.55, 195.1567) -> (-564.55, 212)
  circle A92 centre (-147.0796, 398.1567) radius 2.5
  circle A93 centre (-147.0796, 198.1567) radius 2.5
  circle A94 centre (-147.0796, -1.8433) radius 2.5
  circle A95 centre (-447.0796, 398.1567) radius 2.5
  circle A96 centre (-447.0796, 198.1567) radius 2.5
  circle A97 centre (-447.0796, -1.8433) radius 2.5
  circle A98 centre (-747.0796, 398.1567) radius 2.5 construction
  circle A99 centre (-747.0796, 198.1567) radius 2.5
  circle A100 centre (-747.0796, -1.8433) radius 2.5 construction
  line L257 (-264.55, 388.1567) -> (-245.35, 388.1567)
  line L258 (-245.35, 388.1567) -> (-245.35, 392.1567)
  line L259 (-245.35, 392.1567) -> (-261.55, 392.1567)
  arc A101 (-264.55, 395.1567) -> (-261.55, 392.1567) centre (-261.55, 395.1567) ccw
  line L260 (-260.55, 388.1567) -> (-249.35, 388.1567) construction
  line L261 (-249.35, 388.1567) -> (-249.35, 392.1567) construction
  line L262 (-249.35, 392.1567) -> (-260.55, 392.1567) construction
  line L263 (-260.55, 392.1567) -> (-260.55, 388.1567) construction
  line L264 (-260.55, 388.1567) -> (-249.35, 392.1567) construction
  line L265 (-249.35, 388.1567) -> (-260.55, 392.1567) construction
  line L266 (-264.55, 412) -> (-264.55, 395.1567)
  arc A102 (-157.0796, 106.4587) -> (-171.0796, 106.4587) centre (-164.0796, 106.4587) ccw
  line L267 (-157.0796, 106.4587) -> (-157.0796, 100)
  arc A103 (-157.0796, 306.4587) -> (-171.0796, 306.4587) centre (-164.0796, 306.4587) ccw
  line L268 (-157.0796, 306.4587) -> (-157.0796, 300)
  arc A104 (-157.0796, 506.4587) -> (-171.0796, 506.4587) centre (-164.0796, 506.4587) ccw
  line L269 (-157.0796, 506.4587) -> (-157.0796, 500)
  arc A105 (-457.0796, 106.4587) -> (-471.0796, 106.4587) centre (-464.0796, 106.4587) ccw
  line L270 (-457.0796, 106.4587) -> (-457.0796, 100)
  arc A106 (-457.0796, 306.4587) -> (-471.0796, 306.4587) centre (-464.0796, 306.4587) ccw
  line L271 (-457.0796, 306.4587) -> (-457.0796, 300)
  arc A107 (-457.0796, 506.4587) -> (-471.0796, 506.4587) centre (-464.0796, 506.4587) ccw construction
  line L272 (-457.0796, 506.4587) -> (-457.0796, 500) construction
  point P0 (158.3765, 0)
  point P1 (-148.021, 75)
  point P2 (-128.5398, 50)
  point P3 (-95.6611, 25)
  point P4 (-51.1799, 6.6987)
  point P5 (-155.8997, 93.3013)
  point P6 (-148.021, 275)
  point P7 (-128.5398, 250)
  point P8 (-95.6611, 225)
  point P9 (-51.1799, 206.6987)
  point P10 (-157.0796, 303.4587)
  point P11 (-157.0796, 200)
  point P12 (-171.0796, 303.4587)
  point P13 (-6, 188.1567)
  point P14 (-142.7917, 285.4273)
  point P15 (-148.021, 475)
  point P16 (-128.5398, 450)
  point P17 (-95.6611, 425)
  point P18 (-51.1799, 406.6987)
  point P19 (-157.0796, 503.4587)
  point P20 (-157.0796, 400)
  point P21 (-171.0796, 503.4587)
  point P22 (-6, 388.1567)
  point P23 (-142.7917, 485.4273)
  point P24 (-448.021, 75)
  point P25 (-428.5398, 50)
  point P26 (-395.6611, 25)
  point P27 (-351.1799, 6.6987)
  point P28 (-457.0796, 103.4587)
  point P29 (-457.0796, 0)
  point P30 (-471.0796, 103.4587)
  point P31 (-306, -11.8433)
  point P32 (-442.7917, 85.4273)
  point P33 (-448.021, 275)
  point P34 (-428.5398, 250)
  point P35 (-395.6611, 225)
  point P36 (-351.1799, 206.6987)
  point P37 (-457.0796, 303.4587)
  point P38 (-457.0796, 200)
  point P39 (-471.0796, 303.4587)
  point P40 (-306, 188.1567)
  point P41 (-442.7917, 285.4273)
  point P42 (-448.021, 475)
  point P43 (-428.5398, 450)
  point P44 (-395.6611, 425)
  point P45 (-351.1799, 406.6987)
  point P46 (-457.0796, 503.4587)
  point P47 (-457.0796, 400)
  point P48 (-471.0796, 503.4587)
  point P49 (-306, 388.1567)
  point P50 (-442.7917, 485.4273)
  point P51 (-421.2258, 50.7726)
  point P52 (-392.6255, 29.6644)
  point P53 (-346.6709, 11.6004)
  point P54 (-436.0267, 68.102)
  point P55 (-457.0796, 503.4587)
  point P56 (-504.6796, 390.1567)
  point P57 (-606, 188.1567)
  point P58 (-757.0796, 200)
  point P59 (-748.021, 275)
  point P60 (-728.5398, 250)
  point P61 (-757.0796, 303.4587)
  point P62 (-695.6611, 225)
  point P63 (-651.1799, 206.6987)
  point P64 (-742.7917, 285.4273)
  point P65 (-771.0796, 303.4587)
  point P66 (-804.6796, 190.1567)
  point P67 (-564.55, 188.1567)
  point P68 (-554.95, 190.1567)
  point P69 (-254.95, 390.1567)
  dimension "d43" = 25.75
  dimension "diameter" = 100
  dimension "d8" = 26.1799
  dimension "d14" = 30
  dimension "d15" = 30
  dimension "d16" = 30
  dimension "d32" = 10.625
  dimension "d47" = 8
  dimension "d49" = 2
  dimension "d53" = 21.25
  dimension "d62" = 20.825
  dimension "d123" = 120
  dimension "d126" = 59.109
  dimension "d137" = 2
  dimension "d138" = 90
  dimension "d139" = 90
  dimension "d141" = 7.1
  dimension "d142" = 14
  dimension "d143" = 7.1
  dimension "d144" = 12
  dimension "d145" = 5
  dimension "d146" = 35
  dimension "d147" = 24
  dimension "hole" = 5
  dimension "d155" = 5
  dimension "d156" = 9
  dimension "d157" = 5
  dimension "d158" = 6
  dimension "d159" = 5
  dimension "d160" = 5
  dimension "d241" = 120.891
  dimension "d244" = 120
  dimension "d245" = 30
  dimension "d246" = 3
  dimension "d249" = 200
  dimension "d252" = 300
  dimension "d255" = 120
  dimension "d256" = 5.1701
  dimension "d259" = 0.5
  dimension "d260" = 0.5
  dimension "d261" = 120
  dimension "d262" = 120
  dimension "d264" = 5.1701
  dimension "d265" = 38
  dimension "d268" = 300
  dimension "d275" = 200
  dimension "d288" = 5.1701
  dimension "d289" = 5.1701
  dimension "d290" = 5.1701
  dimension "d291" = 5.1701
  dimension "d292" = 11.2
  dimension "d293" = 4
  dimension "d294" = 4
  dimension "d296" = 3
  dimension "d299" = 300
  dimension "d324" = 11.2
  dimension "d325" = 4
  dimension "d326" = 4
  dimension "d328" = 3
  dimension "d330" = 5
  dimension "d331" = 10
  dimension "d332" = 10
  dimension "d335" = 200
  dimension "d338" = 300
  dimension "d341" = 7.1
  dimension "d342" = 4.6
sketch "Sketch5" plane through (0, 0, 0) normal (0, 0, 1) x (1, 0, 0)
  circle A0 centre (-171.0796, 114.7323) radius 2
  arc A1 (-168.5126, 119.023) -> (-173.6466, 110.4415) centre (-171.0796, 114.7323) ccw construction
  line L0 (-173.6466, 110.4415) -> (-168.5126, 119.023) construction
  line L1 (-173.6466, 110.4415) -> (-138.1894, 89.2287) construction
  line L2 (-134.2131, 98.5028) -> (-168.5126, 119.023) construction
  line L3 (-136.4861, 99.8627) -> (-168.5365, 119.0373)
  line L4 (-135.6205, 93.5183) -> (-169.3633, 113.7055) construction
  line L5 (-168.5365, 119.0373) -> (-171.6804, 120.9182)
  line L6 (-191.131, 120.9018) -> (-173.6466, 110.4415)
  line L7 (-141.6201, 91.2812) -> (-173.6466, 110.4415)
  arc A2 (-141.0754, 84.4005) -> (-138.014, 141.6941) centre (-171.0796, 114.7323) ccw construction
  line L8 (-137.3368, 94.5451) -> (-143.2815, 84.6085) construction
  line L9 (-141.0754, 84.4005) -> (-135.6205, 93.5183) construction
  line L10 (-133.0535, 97.8091) -> (-135.6205, 93.5183) construction
  line L11 (-171.6804, 120.9182) -> (-176.8144, 118.1632)
  line L12 (-176.8144, 118.1632) -> (-183.8017, 122.3435)
  line L13 (-183.8017, 122.3435) -> (-183.8017, 128.1699)
  line L14 (-183.8017, 128.1699) -> (-188.8017, 131.1613)
  line L15 (-188.8017, 131.1613) -> (-191.131, 129.9113)
  line L16 (-191.131, 129.9113) -> (-191.131, 120.9018)
  line L17 (-157.0796, 100) -> (-157.0796, 38) construction
  line L18 (-139.0531, 95.5719) -> (-141.6201, 91.2812)
  line L19 (-139.0531, 95.5719) -> (-136.4861, 99.8627) construction
  line L20 (-136.4861, 99.8627) -> (-133.7901, 98.2498)
  line L21 (-133.7901, 98.2498) -> (-136.3571, 93.959) construction
  line L22 (-136.3571, 93.959) -> (-139.0531, 95.5719)
  line L23 (-136.3571, 93.959) -> (-138.9241, 89.6683)
  line L24 (-138.9241, 89.6683) -> (-105.4563, 69.6457)
  line L25 (-133.7901, 98.2498) -> (-100.3223, 78.2271)
  line L26 (-122.1902, 79.657) -> (-117.0562, 88.2385)
  circle A3 centre (-68.1668, 53.1631) radius 2
  arc A4 (-70.7338, 48.8724) -> (-65.5998, 57.4539) centre (-68.1668, 53.1631) ccw construction
  line L27 (-70.7338, 48.8724) -> (-65.5998, 57.4539) construction
  line L28 (-70.7338, 48.8724) -> (-106.1911, 70.0852) construction
  line L29 (-99.8994, 77.9741) -> (-65.5998, 57.4539) construction
  line L30 (-97.6264, 76.6142) -> (-65.576, 57.4396)
  line L31 (-103.626, 74.3771) -> (-69.8831, 54.1899) construction
  line L32 (-65.576, 57.4396) -> (-62.4321, 55.5587)
  line L33 (-53.2495, 38.4121) -> (-70.7338, 48.8724)
  line L34 (-102.7604, 68.0328) -> (-70.7338, 48.8724)
  line L35 (-101.9097, 73.3503) -> (-107.8544, 63.4137) construction
  line L36 (-109.0809, 65.2593) -> (-103.626, 74.3771) construction
  line L37 (-62.4321, 55.5587) -> (-62.4321, 49.7322)
  line L38 (-62.4321, 49.7322) -> (-55.4448, 45.552)
  line L39 (-55.4448, 45.552) -> (-50.3108, 48.307)
  line L40 (-50.3108, 48.307) -> (-45.3108, 45.3156)
  line L41 (-45.3108, 45.3156) -> (-45.3108, 42.6722)
  line L42 (-45.3108, 42.6722) -> (-53.2495, 38.4121)
  line L43 (-100.1934, 72.3235) -> (-102.7604, 68.0328)
  line L44 (-100.1934, 72.3235) -> (-97.6264, 76.6142) construction
  line L45 (-102.8893, 73.9364) -> (-100.1934, 72.3235)
  line L46 (-102.8893, 73.9364) -> (-105.4563, 69.6457)
  line L47 (-97.6264, 76.6142) -> (-100.3223, 78.2271)
  line L48 (-105.4563, 69.6457) -> (-108.3442, 64.8186)
  line L49 (-108.3442, 64.8186) -> (-141.812, 84.8412)
  line L50 (-141.812, 84.8412) -> (-138.9241, 89.6683)
  line L51 (0, 0) -> (-157.0796, 93.9753) construction
  point P0 (-103.626, 74.3771)
  point P1 (-101.7882, 73.2776)
  point P2 (-87.7679, 58.5332)
  dimension "d346" = 4
  dimension "d347" = 3
  dimension "d364" = 59.109
  dimension "d365" = 5
  dimension "d366" = 25
  dimension "d377" = 66.3205
  dimension "d379" = 2
  dimension "d380" = 3.1416
  dimension "d381" = 39
extrude "Extrusion3" add sketch "Sketch5" along normal blind 2
sketch "Sketch11" plane through (0, 0, 2) normal (0, 0, 1) x (1, 0, 0)
  line L0 (-139.0531, 95.5719) -> (-136.3571, 93.959) projected
  line L1 (-139.0531, 95.5719) -> (-136.4861, 99.8627)
  line L2 (-100.1934, 72.3235) -> (-102.7604, 68.0328) projected
  line L3 (-62.4321, 55.5587) -> (-171.6804, 120.9182) projected
  point P0 (0, 0)
bend part "Bend Part5" radius 2 angle 90 line through (-139.0531, 95.5719, 2) along (0.5134007, 0.858149, 0) centre toward (0, 0, 1) moving side (0.858149, -0.5134007, 0) both sides no
sketch "Sketch13" plane through (-134.7698, 98.8359, 4) normal (-0.858149, 0.5134007, 0) x (0, 0, 1)
  line L0 (39, -5) -> (39, 0)
  line L1 (83.1535, 0) -> (0, 0) projected
  line L2 (39, -15.625) -> (39, -5) projected
  point P0 (-4, -15.625)
bend part "Bend Part7" radius 2 angle 90 line through (-137.3368, 94.5451, 43) along (0.5134007, 0.858149, 0) centre toward (-0.858149, 0.5134007, 0) moving side (0, 0, 1) both sides no
properties part number "6starter-v3"
